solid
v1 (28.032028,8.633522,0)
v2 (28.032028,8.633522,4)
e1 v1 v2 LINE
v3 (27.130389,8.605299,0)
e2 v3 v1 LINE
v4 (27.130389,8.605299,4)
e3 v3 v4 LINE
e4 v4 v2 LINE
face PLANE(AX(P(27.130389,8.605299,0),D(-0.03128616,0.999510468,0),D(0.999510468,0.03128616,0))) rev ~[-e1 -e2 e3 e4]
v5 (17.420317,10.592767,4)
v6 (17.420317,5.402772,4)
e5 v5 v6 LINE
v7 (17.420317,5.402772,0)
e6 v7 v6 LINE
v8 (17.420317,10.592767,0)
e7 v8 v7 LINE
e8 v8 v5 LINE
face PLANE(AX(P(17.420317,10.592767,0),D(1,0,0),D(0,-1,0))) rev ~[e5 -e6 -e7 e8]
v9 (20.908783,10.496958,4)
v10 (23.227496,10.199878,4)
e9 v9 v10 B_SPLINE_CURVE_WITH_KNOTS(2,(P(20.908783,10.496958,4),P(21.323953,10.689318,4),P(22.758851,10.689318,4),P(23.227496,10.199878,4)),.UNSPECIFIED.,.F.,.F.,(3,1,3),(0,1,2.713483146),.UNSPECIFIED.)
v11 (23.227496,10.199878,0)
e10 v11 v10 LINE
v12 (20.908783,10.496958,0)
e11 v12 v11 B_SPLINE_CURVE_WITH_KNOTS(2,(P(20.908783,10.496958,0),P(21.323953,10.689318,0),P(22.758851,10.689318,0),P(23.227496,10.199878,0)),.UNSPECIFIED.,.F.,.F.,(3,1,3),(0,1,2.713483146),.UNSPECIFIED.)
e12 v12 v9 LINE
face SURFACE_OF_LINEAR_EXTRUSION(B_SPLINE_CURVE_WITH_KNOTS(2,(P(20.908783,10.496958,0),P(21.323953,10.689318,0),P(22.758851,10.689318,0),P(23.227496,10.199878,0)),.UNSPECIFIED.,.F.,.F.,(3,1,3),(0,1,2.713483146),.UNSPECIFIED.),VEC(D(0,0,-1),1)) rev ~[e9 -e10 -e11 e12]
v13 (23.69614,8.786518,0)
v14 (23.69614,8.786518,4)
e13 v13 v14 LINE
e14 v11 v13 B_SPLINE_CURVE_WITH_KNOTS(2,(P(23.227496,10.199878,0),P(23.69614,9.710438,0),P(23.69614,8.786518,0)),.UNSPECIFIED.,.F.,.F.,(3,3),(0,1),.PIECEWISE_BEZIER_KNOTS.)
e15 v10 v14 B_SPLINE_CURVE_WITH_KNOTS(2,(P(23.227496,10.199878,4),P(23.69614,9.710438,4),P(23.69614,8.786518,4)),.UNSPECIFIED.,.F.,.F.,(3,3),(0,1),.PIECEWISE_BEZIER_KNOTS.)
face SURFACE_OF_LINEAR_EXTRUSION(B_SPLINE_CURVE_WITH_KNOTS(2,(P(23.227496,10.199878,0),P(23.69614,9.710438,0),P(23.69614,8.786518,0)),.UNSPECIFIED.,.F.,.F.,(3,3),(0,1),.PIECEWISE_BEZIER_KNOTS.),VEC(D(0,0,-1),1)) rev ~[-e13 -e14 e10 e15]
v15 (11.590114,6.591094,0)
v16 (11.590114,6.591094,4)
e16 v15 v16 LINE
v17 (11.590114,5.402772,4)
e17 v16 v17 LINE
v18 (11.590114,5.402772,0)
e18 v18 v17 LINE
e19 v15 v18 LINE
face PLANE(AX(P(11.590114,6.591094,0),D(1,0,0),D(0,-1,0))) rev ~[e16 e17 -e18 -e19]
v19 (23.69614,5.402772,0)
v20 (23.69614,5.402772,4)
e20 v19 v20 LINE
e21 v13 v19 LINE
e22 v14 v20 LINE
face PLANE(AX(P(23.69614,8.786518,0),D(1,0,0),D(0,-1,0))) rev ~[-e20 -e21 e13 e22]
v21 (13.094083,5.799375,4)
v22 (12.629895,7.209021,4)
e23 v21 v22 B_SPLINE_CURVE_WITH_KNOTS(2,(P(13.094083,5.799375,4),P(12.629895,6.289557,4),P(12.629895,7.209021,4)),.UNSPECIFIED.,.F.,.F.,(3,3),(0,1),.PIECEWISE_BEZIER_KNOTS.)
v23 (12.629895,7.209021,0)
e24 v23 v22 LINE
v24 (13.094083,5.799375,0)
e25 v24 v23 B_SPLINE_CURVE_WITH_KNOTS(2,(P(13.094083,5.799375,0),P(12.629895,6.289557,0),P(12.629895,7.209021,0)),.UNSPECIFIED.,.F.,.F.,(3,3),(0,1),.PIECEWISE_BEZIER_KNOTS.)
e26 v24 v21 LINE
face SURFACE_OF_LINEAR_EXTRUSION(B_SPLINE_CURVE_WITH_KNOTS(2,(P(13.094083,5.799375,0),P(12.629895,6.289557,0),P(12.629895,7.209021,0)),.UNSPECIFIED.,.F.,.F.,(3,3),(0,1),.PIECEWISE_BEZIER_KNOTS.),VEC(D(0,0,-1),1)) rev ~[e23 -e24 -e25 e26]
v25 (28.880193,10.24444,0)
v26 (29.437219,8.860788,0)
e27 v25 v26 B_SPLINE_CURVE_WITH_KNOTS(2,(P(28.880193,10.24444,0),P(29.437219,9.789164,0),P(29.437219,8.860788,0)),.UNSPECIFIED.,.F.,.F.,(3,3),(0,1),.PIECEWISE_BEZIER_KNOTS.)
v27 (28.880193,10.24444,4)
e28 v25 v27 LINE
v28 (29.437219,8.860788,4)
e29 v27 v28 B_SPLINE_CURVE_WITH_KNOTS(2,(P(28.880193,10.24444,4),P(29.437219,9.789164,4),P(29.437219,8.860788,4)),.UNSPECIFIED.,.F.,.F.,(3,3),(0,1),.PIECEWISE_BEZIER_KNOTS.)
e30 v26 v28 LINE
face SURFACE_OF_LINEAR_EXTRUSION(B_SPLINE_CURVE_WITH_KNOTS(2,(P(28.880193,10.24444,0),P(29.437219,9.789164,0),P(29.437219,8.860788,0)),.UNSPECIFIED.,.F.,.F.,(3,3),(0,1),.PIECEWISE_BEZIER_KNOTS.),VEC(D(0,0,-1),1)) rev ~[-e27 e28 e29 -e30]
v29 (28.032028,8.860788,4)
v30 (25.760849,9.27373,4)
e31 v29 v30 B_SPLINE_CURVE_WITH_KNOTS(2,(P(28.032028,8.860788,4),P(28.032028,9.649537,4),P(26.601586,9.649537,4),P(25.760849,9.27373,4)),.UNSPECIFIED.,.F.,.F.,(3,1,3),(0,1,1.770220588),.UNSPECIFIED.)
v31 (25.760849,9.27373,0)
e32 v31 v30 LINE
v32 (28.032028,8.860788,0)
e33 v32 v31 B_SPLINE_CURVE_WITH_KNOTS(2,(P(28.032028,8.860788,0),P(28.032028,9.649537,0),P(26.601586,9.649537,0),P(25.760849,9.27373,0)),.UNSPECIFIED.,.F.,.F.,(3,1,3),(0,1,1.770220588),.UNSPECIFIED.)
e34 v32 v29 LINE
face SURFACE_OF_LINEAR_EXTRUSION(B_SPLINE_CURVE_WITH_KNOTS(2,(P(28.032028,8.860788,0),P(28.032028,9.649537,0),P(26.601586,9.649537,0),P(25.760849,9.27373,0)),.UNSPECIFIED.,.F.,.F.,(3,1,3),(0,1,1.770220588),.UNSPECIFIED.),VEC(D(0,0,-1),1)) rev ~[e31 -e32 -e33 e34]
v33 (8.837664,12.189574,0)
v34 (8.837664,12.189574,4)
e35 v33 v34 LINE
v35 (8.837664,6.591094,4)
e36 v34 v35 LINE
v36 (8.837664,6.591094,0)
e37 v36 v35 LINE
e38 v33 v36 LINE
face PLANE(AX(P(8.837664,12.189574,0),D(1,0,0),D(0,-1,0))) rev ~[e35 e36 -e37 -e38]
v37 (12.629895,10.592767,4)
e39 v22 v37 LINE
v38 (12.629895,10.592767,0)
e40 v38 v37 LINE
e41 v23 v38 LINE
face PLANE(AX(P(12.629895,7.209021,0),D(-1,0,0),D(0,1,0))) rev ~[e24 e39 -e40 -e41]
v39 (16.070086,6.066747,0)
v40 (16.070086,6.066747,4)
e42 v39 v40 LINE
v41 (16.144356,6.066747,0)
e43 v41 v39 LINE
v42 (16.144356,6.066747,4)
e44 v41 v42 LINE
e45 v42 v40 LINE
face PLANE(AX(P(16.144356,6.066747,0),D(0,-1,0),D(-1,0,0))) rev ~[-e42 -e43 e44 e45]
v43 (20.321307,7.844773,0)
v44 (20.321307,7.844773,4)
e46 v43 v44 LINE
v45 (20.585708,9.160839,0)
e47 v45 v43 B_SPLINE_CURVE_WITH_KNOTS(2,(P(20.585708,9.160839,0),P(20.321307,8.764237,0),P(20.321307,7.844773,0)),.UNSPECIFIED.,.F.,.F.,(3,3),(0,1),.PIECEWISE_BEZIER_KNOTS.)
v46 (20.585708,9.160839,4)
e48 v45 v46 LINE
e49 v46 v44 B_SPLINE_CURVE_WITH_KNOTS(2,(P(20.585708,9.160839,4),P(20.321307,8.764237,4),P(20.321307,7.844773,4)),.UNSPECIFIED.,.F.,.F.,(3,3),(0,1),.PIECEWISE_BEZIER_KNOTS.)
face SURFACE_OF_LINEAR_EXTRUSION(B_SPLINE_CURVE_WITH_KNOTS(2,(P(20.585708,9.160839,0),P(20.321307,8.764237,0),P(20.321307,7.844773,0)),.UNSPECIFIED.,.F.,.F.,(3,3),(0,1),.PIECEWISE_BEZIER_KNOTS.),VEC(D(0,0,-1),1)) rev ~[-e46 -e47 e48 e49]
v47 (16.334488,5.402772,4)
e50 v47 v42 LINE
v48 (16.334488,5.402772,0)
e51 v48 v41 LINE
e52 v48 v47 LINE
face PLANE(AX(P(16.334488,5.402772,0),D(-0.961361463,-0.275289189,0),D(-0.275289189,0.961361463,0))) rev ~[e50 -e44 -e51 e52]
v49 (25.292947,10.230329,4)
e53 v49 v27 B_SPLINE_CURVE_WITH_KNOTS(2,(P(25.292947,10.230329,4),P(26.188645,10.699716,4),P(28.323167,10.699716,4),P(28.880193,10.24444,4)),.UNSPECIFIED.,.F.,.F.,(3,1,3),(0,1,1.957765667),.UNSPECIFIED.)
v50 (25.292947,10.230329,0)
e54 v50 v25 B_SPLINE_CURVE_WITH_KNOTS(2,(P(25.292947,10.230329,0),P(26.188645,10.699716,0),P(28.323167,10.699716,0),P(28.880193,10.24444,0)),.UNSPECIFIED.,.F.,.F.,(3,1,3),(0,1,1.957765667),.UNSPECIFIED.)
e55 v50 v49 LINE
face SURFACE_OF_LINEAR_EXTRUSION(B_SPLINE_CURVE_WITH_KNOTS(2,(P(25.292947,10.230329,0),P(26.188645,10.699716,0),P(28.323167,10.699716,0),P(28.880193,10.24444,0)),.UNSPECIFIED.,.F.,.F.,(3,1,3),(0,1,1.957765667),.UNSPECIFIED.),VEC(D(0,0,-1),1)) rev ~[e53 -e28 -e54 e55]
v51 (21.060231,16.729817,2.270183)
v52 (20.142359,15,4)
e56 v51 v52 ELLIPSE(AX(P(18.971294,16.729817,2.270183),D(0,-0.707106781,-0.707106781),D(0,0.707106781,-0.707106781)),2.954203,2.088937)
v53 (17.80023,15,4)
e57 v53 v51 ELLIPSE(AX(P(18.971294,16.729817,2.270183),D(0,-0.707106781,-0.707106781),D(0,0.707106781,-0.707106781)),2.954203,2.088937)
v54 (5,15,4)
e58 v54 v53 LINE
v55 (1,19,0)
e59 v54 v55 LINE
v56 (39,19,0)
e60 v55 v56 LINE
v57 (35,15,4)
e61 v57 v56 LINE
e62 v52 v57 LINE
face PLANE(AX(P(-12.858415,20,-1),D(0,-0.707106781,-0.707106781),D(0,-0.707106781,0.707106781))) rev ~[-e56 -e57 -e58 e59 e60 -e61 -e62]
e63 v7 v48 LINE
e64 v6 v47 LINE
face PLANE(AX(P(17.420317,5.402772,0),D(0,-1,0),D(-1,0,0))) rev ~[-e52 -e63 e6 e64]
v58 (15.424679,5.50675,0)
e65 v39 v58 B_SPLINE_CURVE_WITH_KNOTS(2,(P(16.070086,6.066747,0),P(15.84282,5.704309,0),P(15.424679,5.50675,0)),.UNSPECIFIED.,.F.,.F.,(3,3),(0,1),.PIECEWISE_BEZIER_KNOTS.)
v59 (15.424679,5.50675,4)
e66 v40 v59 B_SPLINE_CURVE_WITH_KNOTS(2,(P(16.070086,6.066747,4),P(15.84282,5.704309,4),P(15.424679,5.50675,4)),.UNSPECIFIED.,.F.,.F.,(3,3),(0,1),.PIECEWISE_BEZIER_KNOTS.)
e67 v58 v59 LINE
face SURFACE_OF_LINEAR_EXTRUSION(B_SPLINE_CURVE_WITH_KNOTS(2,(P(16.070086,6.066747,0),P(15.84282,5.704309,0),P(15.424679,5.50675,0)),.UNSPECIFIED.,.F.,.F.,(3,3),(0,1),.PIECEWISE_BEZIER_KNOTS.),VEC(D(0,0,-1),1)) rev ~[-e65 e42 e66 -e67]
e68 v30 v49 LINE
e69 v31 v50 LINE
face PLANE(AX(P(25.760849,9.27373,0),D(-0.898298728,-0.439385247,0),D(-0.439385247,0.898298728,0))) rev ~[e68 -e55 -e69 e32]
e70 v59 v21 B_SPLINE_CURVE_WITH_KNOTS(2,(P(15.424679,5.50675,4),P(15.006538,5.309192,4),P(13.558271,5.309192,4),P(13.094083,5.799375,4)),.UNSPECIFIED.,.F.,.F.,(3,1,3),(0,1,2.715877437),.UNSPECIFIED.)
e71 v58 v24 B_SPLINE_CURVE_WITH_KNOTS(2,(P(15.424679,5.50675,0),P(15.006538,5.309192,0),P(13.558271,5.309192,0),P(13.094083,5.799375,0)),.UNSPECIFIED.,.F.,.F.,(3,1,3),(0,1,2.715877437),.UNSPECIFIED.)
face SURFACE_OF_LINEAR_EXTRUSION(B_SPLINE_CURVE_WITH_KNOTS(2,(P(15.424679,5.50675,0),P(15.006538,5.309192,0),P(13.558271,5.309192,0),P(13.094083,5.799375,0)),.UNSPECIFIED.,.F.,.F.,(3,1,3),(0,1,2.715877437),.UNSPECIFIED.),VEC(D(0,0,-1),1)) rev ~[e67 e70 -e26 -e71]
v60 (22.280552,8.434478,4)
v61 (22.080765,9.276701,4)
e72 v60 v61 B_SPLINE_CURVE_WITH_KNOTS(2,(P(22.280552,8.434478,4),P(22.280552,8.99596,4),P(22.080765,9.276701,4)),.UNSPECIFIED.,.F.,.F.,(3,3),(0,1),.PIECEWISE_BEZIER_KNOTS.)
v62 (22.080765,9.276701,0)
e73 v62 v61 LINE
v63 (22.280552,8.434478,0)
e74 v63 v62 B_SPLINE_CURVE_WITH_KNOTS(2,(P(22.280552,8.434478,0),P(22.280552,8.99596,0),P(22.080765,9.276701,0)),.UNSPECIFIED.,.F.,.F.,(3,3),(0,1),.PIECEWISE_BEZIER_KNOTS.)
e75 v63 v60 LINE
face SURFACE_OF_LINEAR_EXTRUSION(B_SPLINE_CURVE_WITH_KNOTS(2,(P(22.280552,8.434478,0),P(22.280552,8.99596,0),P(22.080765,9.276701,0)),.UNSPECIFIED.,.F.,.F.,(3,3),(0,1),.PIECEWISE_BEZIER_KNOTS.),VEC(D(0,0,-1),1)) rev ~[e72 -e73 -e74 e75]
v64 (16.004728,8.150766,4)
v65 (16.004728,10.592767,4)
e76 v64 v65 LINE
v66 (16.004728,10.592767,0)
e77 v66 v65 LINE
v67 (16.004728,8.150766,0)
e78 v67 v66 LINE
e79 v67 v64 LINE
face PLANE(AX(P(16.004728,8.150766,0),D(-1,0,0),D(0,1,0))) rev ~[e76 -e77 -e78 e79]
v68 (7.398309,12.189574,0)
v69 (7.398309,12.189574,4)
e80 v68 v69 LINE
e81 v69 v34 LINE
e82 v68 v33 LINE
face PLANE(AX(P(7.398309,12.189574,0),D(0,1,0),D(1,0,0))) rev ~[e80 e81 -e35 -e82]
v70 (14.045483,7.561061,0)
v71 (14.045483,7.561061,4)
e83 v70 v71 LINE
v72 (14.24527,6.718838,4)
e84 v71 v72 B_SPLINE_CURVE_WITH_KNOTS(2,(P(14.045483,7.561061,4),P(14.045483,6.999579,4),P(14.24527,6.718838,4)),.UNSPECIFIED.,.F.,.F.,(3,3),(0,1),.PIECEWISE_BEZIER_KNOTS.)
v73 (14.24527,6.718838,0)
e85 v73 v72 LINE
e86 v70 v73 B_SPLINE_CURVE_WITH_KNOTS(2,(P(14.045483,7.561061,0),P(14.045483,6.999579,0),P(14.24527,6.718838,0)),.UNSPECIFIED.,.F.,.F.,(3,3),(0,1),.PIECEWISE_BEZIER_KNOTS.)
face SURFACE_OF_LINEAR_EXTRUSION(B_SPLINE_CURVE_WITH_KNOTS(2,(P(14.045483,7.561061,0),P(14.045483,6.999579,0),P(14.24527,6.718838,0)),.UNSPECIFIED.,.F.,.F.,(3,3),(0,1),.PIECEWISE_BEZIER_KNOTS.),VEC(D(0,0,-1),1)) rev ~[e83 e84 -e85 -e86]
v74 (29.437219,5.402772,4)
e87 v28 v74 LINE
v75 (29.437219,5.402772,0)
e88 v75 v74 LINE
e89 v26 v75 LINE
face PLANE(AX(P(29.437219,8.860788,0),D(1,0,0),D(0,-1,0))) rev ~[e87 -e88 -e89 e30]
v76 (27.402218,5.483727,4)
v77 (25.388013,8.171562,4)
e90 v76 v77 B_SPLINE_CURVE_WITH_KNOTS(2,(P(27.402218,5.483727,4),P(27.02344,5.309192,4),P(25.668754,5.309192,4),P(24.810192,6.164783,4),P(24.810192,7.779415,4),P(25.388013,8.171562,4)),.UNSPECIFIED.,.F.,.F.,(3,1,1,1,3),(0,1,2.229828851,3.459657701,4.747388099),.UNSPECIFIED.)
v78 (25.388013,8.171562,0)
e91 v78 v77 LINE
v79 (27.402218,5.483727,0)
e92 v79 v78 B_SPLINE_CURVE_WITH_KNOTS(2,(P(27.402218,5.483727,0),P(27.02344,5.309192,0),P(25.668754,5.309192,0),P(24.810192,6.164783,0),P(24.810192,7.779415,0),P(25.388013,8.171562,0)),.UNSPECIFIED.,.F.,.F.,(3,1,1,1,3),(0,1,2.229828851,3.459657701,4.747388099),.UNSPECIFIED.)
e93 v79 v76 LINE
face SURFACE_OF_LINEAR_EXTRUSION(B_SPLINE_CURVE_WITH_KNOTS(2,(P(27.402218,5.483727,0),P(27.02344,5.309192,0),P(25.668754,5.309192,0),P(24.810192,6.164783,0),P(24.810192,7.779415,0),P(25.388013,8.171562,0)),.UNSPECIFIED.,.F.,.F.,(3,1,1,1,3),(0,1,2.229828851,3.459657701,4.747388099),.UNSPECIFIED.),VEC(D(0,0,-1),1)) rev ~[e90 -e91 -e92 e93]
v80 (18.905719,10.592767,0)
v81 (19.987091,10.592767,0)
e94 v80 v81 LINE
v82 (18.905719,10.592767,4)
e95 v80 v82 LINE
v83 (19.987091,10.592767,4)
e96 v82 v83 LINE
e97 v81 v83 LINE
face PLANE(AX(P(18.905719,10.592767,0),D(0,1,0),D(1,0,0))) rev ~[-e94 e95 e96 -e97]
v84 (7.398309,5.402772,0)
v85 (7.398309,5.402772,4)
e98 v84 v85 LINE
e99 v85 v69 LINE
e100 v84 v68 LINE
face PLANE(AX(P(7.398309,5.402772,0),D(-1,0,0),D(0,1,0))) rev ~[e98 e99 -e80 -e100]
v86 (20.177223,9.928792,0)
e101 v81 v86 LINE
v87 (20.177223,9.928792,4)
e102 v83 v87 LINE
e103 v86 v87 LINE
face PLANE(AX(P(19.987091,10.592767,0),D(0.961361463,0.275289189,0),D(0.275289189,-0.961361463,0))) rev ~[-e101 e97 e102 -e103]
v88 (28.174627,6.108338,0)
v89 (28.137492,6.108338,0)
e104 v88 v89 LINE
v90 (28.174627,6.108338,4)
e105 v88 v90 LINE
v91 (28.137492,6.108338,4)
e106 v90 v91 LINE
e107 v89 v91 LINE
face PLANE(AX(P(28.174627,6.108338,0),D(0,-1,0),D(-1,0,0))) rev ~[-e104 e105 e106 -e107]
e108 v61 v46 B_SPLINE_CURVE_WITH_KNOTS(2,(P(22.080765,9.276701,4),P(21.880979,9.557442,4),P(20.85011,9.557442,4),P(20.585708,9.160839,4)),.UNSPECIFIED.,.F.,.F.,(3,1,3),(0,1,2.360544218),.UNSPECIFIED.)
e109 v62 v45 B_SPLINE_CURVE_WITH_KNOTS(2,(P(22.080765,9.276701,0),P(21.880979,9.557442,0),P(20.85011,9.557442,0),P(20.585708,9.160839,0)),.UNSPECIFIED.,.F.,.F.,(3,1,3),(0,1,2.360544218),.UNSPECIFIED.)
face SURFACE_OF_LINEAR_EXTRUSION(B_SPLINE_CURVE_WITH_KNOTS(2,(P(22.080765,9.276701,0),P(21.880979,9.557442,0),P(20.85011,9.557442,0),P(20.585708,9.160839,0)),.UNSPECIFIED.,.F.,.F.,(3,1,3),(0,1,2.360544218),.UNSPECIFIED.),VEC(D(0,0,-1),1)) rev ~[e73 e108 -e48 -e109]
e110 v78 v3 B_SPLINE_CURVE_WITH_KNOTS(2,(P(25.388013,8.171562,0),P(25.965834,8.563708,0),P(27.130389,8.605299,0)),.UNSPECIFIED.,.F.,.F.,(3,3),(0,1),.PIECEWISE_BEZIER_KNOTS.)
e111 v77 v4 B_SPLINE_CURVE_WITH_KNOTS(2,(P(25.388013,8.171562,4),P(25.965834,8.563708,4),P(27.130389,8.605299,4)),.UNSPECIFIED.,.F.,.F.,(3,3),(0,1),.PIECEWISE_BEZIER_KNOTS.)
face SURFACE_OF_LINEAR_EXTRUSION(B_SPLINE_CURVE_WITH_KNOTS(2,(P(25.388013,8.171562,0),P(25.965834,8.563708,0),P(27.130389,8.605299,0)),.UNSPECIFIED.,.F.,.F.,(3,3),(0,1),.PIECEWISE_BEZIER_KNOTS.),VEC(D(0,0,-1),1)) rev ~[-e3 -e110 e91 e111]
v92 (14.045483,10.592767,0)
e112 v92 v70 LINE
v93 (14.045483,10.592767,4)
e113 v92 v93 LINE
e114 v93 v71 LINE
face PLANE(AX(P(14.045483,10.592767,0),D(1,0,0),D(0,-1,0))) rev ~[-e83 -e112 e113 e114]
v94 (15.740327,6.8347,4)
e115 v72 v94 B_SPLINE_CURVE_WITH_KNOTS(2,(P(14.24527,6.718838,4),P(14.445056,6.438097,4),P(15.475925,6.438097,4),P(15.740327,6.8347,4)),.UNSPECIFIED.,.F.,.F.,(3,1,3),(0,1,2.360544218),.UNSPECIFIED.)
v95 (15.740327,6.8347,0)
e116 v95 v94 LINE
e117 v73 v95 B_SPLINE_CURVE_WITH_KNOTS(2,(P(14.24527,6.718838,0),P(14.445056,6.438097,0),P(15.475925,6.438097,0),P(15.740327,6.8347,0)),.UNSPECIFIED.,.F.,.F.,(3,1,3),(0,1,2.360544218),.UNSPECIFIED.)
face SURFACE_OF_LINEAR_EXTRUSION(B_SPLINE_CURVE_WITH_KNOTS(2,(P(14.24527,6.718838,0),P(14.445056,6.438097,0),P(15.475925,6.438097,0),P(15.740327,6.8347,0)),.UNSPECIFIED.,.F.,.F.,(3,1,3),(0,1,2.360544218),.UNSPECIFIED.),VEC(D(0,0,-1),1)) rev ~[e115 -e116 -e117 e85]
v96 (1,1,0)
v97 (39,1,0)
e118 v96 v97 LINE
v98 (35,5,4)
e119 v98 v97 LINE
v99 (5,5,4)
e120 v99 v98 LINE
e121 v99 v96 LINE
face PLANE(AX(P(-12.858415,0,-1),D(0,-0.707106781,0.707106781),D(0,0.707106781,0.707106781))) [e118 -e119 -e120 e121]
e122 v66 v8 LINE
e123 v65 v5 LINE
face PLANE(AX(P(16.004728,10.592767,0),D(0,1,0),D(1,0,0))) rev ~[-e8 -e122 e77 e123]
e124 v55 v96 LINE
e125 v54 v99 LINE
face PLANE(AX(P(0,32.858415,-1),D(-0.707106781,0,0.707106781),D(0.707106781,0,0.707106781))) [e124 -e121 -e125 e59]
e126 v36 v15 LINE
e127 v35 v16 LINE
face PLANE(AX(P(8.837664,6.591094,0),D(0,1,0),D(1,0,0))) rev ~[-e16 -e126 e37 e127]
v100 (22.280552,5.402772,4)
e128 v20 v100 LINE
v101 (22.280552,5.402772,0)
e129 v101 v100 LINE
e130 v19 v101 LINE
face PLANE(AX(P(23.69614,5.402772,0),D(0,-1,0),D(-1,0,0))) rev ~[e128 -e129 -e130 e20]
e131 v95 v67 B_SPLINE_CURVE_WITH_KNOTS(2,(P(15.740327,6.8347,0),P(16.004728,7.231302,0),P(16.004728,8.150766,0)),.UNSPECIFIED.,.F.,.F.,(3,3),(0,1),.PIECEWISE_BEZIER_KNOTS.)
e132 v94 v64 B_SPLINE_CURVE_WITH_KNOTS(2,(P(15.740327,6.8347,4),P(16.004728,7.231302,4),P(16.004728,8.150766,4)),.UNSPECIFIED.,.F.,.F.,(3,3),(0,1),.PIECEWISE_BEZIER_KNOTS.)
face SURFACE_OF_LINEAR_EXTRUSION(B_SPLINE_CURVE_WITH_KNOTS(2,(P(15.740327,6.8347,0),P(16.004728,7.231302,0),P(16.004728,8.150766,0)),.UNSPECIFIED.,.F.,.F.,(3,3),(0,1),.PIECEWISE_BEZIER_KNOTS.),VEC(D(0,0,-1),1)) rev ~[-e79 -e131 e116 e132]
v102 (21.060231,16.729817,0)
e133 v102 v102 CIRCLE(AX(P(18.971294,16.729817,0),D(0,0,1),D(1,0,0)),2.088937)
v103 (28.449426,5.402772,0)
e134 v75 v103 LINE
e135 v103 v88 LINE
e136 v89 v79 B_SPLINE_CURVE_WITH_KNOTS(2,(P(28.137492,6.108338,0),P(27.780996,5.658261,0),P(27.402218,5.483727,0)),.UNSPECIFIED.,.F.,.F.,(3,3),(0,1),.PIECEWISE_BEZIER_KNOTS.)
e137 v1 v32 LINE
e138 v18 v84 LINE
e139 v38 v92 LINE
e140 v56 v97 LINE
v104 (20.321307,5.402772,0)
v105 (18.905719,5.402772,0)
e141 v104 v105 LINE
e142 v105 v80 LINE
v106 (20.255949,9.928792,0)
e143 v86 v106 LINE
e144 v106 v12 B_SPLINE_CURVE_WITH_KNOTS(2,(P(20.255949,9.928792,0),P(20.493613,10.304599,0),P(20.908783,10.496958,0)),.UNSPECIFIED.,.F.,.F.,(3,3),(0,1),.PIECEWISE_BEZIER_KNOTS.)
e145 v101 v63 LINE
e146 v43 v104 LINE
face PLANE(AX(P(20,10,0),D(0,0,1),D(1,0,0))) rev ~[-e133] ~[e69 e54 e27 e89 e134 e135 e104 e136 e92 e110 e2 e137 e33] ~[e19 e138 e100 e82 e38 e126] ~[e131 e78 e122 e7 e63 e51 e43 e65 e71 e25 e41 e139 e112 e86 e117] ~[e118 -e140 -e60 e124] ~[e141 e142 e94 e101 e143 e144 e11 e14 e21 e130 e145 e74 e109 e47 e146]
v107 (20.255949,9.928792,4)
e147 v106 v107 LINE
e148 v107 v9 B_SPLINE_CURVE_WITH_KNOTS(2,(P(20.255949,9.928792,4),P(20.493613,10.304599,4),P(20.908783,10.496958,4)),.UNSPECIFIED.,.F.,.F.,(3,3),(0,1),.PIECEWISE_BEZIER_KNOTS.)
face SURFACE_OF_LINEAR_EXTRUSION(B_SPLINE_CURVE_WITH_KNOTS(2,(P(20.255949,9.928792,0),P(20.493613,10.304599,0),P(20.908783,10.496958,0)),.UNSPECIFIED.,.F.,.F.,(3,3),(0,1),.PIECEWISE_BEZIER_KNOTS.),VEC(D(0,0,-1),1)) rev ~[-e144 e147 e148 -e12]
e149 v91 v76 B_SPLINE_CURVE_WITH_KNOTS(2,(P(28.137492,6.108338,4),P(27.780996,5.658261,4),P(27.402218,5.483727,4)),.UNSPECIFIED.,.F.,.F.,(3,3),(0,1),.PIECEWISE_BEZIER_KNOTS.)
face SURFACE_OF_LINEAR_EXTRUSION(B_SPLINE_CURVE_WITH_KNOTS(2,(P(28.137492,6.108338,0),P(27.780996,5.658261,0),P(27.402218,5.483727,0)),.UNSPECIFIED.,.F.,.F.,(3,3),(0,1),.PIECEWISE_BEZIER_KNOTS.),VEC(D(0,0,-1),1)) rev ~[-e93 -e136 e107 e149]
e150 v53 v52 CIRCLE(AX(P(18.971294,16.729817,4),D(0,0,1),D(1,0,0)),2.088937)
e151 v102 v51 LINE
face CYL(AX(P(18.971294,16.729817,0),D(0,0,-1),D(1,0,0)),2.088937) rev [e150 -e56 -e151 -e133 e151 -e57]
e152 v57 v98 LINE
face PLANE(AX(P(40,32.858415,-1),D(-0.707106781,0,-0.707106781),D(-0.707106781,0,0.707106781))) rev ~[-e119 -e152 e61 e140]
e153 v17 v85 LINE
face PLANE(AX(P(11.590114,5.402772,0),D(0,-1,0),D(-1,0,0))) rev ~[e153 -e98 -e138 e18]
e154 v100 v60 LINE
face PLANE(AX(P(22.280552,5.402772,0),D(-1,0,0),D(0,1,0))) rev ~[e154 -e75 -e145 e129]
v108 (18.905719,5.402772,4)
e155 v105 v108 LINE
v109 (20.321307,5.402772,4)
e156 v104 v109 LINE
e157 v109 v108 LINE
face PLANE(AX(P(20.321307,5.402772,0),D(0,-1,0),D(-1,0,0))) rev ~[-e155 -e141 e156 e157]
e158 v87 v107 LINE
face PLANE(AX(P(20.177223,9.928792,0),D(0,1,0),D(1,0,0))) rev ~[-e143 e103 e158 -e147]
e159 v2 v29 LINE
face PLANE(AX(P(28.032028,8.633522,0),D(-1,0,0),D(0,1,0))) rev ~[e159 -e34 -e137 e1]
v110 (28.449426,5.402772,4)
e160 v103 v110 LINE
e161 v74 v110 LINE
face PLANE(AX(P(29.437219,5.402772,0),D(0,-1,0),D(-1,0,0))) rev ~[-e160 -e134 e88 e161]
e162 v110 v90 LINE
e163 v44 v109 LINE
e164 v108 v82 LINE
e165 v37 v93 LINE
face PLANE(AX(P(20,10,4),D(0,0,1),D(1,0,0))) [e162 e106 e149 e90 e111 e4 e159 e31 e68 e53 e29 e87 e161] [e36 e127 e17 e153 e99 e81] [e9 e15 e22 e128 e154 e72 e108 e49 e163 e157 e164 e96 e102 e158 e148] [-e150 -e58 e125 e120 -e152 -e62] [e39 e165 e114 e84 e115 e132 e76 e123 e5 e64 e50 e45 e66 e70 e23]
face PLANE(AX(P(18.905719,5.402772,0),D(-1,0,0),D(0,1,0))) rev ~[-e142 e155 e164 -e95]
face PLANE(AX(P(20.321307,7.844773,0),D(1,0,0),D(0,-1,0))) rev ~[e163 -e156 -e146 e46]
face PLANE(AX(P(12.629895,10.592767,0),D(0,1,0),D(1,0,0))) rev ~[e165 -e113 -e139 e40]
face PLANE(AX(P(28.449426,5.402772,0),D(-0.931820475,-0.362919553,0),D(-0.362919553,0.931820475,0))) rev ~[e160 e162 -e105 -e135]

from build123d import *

# Parameters (mm, degrees)
F0_W        = 40
F0_H        = 20
F0_R        = 2.0889371437
F1_DEPTH    = 4
F2_T1_DEPTH = 65.7168298797
F2_T3_DEPTH = 45.7168298797


# Not quite as in the source:
# - a fillet or chamfer that OpenCascade refuses, or shapes differently, is made with other operations: its cross-section is extruded or revolved along the edge and cut away or added


with BuildPart() as f1:
    # F0 (on Top) → F1 (new body)
    with BuildSketch(Plane.XY):
        with Locations((20, 10)):
            Rectangle(F0_W, F0_H)
        Polygon((11.590113647, 5.4027722217), (7.3983091854, 5.4027722217), (7.3983091854, 12.1895739882), (8.8376637294, 12.1895739882), (8.8376637294, 6.5910938267), (11.590113647, 6.5910938267), align=None, mode=Mode.SUBTRACT)
        with BuildLine():
            Line((17.4203165215, 5.4027722217), (16.3344876549, 5.4027722217))
            Line((16.3344876549, 5.4027722217), (16.1443561981, 6.0667469185))
            Line((16.1443561981, 6.0667469185), (16.0700860978, 6.0667469185))
            add(Edge.make_bspline(
                [(16.0700860978, 6.0667469185), (15.8428195908, 5.704308829), (15.4246789261, 5.5067503622)],
                knots=[0, 0, 0, 1, 1, 1], degree=2))
            add(Edge.make_bspline(
                [(15.4246789261, 5.5067503622), (15.0065382613, 5.3091918953), (14.4732789411, 5.3091918953)],
                knots=[0, 0, 0, 1, 1, 1], degree=2))
            add(Edge.make_bspline(
                [(14.4732789411, 5.3091918953), (13.5582713053, 5.3091918953), (13.0940831783, 5.7993745574)],
                knots=[0, 0, 0, 1, 1, 1], degree=2))
            add(Edge.make_bspline(
                [(13.0940831783, 5.7993745574), (12.6298950514, 6.2895572194), (12.6298950514, 7.2090210613)],
                knots=[0, 0, 0, 1, 1, 1], degree=2))
            Line((12.6298950514, 7.2090210613), (12.6298950514, 10.5927668315))
            Line((12.6298950514, 10.5927668315), (14.0454831633, 10.5927668315))
            Line((14.0454831633, 10.5927668315), (14.0454831633, 7.5610613368))
            add(Edge.make_bspline(
                [(14.0454831633, 7.5610613368), (14.0454831633, 6.9995793784), (14.2452697331, 6.7188383992)],
                knots=[0, 0, 0, 1, 1, 1], degree=2))
            add(Edge.make_bspline(
                [(14.2452697331, 6.7188383992), (14.445056303, 6.4380974201), (14.8817644928, 6.4380974201)],
                knots=[0, 0, 0, 1, 1, 1], degree=2))
            add(Edge.make_bspline(
                [(14.8817644928, 6.4380974201), (15.4759252953, 6.4380974201), (15.7403268524, 6.8346997557)],
                knots=[0, 0, 0, 1, 1, 1], degree=2))
            add(Edge.make_bspline(
                [(15.7403268524, 6.8346997557), (16.0047284095, 7.2313020914), (16.0047284095, 8.1507659333)],
                knots=[0, 0, 0, 1, 1, 1], degree=2))
            Line((16.0047284095, 8.1507659333), (16.0047284095, 10.5927668315))
            Line((16.0047284095, 10.5927668315), (17.4203165215, 10.5927668315))
            Line((17.4203165215, 10.5927668315), (17.4203165215, 5.4027722217))
        make_face(mode=Mode.SUBTRACT)
        with BuildLine():
            Line((23.6961399978, 8.7865179919), (23.6961399978, 5.4027722217))
            Line((23.6961399978, 5.4027722217), (22.2805518859, 5.4027722217))
            Line((22.2805518859, 5.4027722217), (22.2805518859, 8.4344777164))
            add(Edge.make_bspline(
                [(22.2805518859, 8.4344777164), (22.2805518859, 8.9959596748), (22.080765316, 9.276700654)],
                knots=[0, 0, 0, 1, 1, 1], degree=2))
            add(Edge.make_bspline(
                [(22.080765316, 9.276700654), (21.8809787462, 9.5574416332), (21.4442705564, 9.5574416332)],
                knots=[0, 0, 0, 1, 1, 1], degree=2))
            add(Edge.make_bspline(
                [(21.4442705564, 9.5574416332), (20.8501097539, 9.5574416332), (20.5857081968, 9.1608392975)],
                knots=[0, 0, 0, 1, 1, 1], degree=2))
            add(Edge.make_bspline(
                [(20.5857081968, 9.1608392975), (20.3213066396, 8.7642369618), (20.3213066396, 7.84477312)],
                knots=[0, 0, 0, 1, 1, 1], degree=2))
            Line((20.3213066396, 7.84477312), (20.3213066396, 5.4027722217))
            Line((20.3213066396, 5.4027722217), (18.9057185277, 5.4027722217))
            Line((18.9057185277, 5.4027722217), (18.9057185277, 10.5927668315))
            Line((18.9057185277, 10.5927668315), (19.9870911882, 10.5927668315))
            Line((19.9870911882, 10.5927668315), (20.177222645, 9.9287921347))
            Line((20.177222645, 9.9287921347), (20.2559489514, 9.9287921347))
            add(Edge.make_bspline(
                [(20.2559489514, 9.9287921347), (20.4936132724, 10.3045988423), (20.9087831331, 10.4969584021)],
                knots=[0, 0, 0, 1, 1, 1], degree=2))
            add(Edge.make_bspline(
                [(20.9087831331, 10.4969584021), (21.3239529939, 10.6893179619), (21.8527561081, 10.6893179619)],
                knots=[0, 0, 0, 1, 1, 1], degree=2))
            add(Edge.make_bspline(
                [(21.8527561081, 10.6893179619), (22.7588513319, 10.6893179619), (23.2274956648, 10.1998780009)],
                knots=[0, 0, 0, 1, 1, 1], degree=2))
            add(Edge.make_bspline(
                [(23.2274956648, 10.1998780009), (23.6961399978, 9.7104380398), (23.6961399978, 8.7865179919)],
                knots=[0, 0, 0, 1, 1, 1], degree=2))
        make_face(mode=Mode.SUBTRACT)
        with BuildLine():
            Line((29.4372187519, 5.4027722217), (28.4494264178, 5.4027722217))
            Line((28.4494264178, 5.4027722217), (28.1746270466, 6.1083381747))
            Line((28.1746270466, 6.1083381747), (28.1374919965, 6.1083381747))
            add(Edge.make_bspline(
                [(28.1374919965, 6.1083381747), (27.780995515, 5.6582613668), (27.4022180034, 5.4837266311)],
                knots=[0, 0, 0, 1, 1, 1], degree=2))
            add(Edge.make_bspline(
                [(27.4022180034, 5.4837266311), (27.0234404918, 5.3091918953), (26.4159110712, 5.3091918953)],
                knots=[0, 0, 0, 1, 1, 1], degree=2))
            add(Edge.make_bspline(
                [(26.4159110712, 5.3091918953), (25.6687538621, 5.3091918953), (25.2394726823, 5.7369876731)],
                knots=[0, 0, 0, 1, 1, 1], degree=2))
            add(Edge.make_bspline(
                [(25.2394726823, 5.7369876731), (24.8101915025, 6.1647834509), (24.8101915025, 6.9535319162)],
                knots=[0, 0, 0, 1, 1, 1], degree=2))
            add(Edge.make_bspline(
                [(24.8101915025, 6.9535319162), (24.8101915025, 7.7794154317), (25.3880128829, 8.1715615613)],
                knots=[0, 0, 0, 1, 1, 1], degree=2))
            add(Edge.make_bspline(
                [(25.3880128829, 8.1715615613), (25.9658342633, 8.563707691), (27.1303894362, 8.6052989472)],
                knots=[0, 0, 0, 1, 1, 1], degree=2))
            Line((27.1303894362, 8.6052989472), (28.032028454, 8.6335215853))
            Line((28.032028454, 8.6335215853), (28.032028454, 8.8607880922))
            add(Edge.make_bspline(
                [(28.032028454, 8.8607880922), (28.032028454, 9.6495365575), (27.2239697626, 9.6495365575)],
                knots=[0, 0, 0, 1, 1, 1], degree=2))
            add(Edge.make_bspline(
                [(27.2239697626, 9.6495365575), (26.601586322, 9.6495365575), (25.7608487865, 9.27372985)],
                knots=[0, 0, 0, 1, 1, 1], degree=2))
            Line((25.7608487865, 9.27372985), (25.2929471545, 10.230328742))
            add(Edge.make_bspline(
                [(25.2929471545, 10.230328742), (26.1886445643, 10.699715776), (27.2789296369, 10.699715776)],
                knots=[0, 0, 0, 1, 1, 1], degree=2))
            add(Edge.make_bspline(
                [(27.2789296369, 10.699715776), (28.3231672472, 10.699715776), (28.8801929996, 10.244440061)],
                knots=[0, 0, 0, 1, 1, 1], degree=2))
            add(Edge.make_bspline(
                [(28.8801929996, 10.244440061), (29.4372187519, 9.7891643461), (29.4372187519, 8.8607880922)],
                knots=[0, 0, 0, 1, 1, 1], degree=2))
            Line((29.4372187519, 8.8607880922), (29.4372187519, 5.4027722217))
        make_face(mode=Mode.SUBTRACT)
        with Locations((18.9712941647, 16.7298167944)):
            Circle(F0_R, mode=Mode.SUBTRACT)
    extrude(amount=F1_DEPTH)

    # F2: chamfer of 5 on 4 edges, made by hand

    # F2_s2 → F2_t1 (cut)
    with BuildSketch(Plane.YZ.offset(-12.8584149398)):
        Polygon((20, -1), (15, 4), (20, 4), align=None)
        Polygon((0, -1), (5, 4), (0, 4), align=None)
    extrude(amount=F2_T1_DEPTH, mode=Mode.SUBTRACT)

    # F2_s4 → F2_t3 (cut)
    with BuildSketch(Plane.XZ.offset(-32.8584149398)):
        Polygon((0, -1), (5, 4), (0, 4), align=None)
        Polygon((40, -1), (35, 4), (40, 4), align=None)
    extrude(amount=F2_T3_DEPTH, mode=Mode.SUBTRACT)


solid = f1.part
